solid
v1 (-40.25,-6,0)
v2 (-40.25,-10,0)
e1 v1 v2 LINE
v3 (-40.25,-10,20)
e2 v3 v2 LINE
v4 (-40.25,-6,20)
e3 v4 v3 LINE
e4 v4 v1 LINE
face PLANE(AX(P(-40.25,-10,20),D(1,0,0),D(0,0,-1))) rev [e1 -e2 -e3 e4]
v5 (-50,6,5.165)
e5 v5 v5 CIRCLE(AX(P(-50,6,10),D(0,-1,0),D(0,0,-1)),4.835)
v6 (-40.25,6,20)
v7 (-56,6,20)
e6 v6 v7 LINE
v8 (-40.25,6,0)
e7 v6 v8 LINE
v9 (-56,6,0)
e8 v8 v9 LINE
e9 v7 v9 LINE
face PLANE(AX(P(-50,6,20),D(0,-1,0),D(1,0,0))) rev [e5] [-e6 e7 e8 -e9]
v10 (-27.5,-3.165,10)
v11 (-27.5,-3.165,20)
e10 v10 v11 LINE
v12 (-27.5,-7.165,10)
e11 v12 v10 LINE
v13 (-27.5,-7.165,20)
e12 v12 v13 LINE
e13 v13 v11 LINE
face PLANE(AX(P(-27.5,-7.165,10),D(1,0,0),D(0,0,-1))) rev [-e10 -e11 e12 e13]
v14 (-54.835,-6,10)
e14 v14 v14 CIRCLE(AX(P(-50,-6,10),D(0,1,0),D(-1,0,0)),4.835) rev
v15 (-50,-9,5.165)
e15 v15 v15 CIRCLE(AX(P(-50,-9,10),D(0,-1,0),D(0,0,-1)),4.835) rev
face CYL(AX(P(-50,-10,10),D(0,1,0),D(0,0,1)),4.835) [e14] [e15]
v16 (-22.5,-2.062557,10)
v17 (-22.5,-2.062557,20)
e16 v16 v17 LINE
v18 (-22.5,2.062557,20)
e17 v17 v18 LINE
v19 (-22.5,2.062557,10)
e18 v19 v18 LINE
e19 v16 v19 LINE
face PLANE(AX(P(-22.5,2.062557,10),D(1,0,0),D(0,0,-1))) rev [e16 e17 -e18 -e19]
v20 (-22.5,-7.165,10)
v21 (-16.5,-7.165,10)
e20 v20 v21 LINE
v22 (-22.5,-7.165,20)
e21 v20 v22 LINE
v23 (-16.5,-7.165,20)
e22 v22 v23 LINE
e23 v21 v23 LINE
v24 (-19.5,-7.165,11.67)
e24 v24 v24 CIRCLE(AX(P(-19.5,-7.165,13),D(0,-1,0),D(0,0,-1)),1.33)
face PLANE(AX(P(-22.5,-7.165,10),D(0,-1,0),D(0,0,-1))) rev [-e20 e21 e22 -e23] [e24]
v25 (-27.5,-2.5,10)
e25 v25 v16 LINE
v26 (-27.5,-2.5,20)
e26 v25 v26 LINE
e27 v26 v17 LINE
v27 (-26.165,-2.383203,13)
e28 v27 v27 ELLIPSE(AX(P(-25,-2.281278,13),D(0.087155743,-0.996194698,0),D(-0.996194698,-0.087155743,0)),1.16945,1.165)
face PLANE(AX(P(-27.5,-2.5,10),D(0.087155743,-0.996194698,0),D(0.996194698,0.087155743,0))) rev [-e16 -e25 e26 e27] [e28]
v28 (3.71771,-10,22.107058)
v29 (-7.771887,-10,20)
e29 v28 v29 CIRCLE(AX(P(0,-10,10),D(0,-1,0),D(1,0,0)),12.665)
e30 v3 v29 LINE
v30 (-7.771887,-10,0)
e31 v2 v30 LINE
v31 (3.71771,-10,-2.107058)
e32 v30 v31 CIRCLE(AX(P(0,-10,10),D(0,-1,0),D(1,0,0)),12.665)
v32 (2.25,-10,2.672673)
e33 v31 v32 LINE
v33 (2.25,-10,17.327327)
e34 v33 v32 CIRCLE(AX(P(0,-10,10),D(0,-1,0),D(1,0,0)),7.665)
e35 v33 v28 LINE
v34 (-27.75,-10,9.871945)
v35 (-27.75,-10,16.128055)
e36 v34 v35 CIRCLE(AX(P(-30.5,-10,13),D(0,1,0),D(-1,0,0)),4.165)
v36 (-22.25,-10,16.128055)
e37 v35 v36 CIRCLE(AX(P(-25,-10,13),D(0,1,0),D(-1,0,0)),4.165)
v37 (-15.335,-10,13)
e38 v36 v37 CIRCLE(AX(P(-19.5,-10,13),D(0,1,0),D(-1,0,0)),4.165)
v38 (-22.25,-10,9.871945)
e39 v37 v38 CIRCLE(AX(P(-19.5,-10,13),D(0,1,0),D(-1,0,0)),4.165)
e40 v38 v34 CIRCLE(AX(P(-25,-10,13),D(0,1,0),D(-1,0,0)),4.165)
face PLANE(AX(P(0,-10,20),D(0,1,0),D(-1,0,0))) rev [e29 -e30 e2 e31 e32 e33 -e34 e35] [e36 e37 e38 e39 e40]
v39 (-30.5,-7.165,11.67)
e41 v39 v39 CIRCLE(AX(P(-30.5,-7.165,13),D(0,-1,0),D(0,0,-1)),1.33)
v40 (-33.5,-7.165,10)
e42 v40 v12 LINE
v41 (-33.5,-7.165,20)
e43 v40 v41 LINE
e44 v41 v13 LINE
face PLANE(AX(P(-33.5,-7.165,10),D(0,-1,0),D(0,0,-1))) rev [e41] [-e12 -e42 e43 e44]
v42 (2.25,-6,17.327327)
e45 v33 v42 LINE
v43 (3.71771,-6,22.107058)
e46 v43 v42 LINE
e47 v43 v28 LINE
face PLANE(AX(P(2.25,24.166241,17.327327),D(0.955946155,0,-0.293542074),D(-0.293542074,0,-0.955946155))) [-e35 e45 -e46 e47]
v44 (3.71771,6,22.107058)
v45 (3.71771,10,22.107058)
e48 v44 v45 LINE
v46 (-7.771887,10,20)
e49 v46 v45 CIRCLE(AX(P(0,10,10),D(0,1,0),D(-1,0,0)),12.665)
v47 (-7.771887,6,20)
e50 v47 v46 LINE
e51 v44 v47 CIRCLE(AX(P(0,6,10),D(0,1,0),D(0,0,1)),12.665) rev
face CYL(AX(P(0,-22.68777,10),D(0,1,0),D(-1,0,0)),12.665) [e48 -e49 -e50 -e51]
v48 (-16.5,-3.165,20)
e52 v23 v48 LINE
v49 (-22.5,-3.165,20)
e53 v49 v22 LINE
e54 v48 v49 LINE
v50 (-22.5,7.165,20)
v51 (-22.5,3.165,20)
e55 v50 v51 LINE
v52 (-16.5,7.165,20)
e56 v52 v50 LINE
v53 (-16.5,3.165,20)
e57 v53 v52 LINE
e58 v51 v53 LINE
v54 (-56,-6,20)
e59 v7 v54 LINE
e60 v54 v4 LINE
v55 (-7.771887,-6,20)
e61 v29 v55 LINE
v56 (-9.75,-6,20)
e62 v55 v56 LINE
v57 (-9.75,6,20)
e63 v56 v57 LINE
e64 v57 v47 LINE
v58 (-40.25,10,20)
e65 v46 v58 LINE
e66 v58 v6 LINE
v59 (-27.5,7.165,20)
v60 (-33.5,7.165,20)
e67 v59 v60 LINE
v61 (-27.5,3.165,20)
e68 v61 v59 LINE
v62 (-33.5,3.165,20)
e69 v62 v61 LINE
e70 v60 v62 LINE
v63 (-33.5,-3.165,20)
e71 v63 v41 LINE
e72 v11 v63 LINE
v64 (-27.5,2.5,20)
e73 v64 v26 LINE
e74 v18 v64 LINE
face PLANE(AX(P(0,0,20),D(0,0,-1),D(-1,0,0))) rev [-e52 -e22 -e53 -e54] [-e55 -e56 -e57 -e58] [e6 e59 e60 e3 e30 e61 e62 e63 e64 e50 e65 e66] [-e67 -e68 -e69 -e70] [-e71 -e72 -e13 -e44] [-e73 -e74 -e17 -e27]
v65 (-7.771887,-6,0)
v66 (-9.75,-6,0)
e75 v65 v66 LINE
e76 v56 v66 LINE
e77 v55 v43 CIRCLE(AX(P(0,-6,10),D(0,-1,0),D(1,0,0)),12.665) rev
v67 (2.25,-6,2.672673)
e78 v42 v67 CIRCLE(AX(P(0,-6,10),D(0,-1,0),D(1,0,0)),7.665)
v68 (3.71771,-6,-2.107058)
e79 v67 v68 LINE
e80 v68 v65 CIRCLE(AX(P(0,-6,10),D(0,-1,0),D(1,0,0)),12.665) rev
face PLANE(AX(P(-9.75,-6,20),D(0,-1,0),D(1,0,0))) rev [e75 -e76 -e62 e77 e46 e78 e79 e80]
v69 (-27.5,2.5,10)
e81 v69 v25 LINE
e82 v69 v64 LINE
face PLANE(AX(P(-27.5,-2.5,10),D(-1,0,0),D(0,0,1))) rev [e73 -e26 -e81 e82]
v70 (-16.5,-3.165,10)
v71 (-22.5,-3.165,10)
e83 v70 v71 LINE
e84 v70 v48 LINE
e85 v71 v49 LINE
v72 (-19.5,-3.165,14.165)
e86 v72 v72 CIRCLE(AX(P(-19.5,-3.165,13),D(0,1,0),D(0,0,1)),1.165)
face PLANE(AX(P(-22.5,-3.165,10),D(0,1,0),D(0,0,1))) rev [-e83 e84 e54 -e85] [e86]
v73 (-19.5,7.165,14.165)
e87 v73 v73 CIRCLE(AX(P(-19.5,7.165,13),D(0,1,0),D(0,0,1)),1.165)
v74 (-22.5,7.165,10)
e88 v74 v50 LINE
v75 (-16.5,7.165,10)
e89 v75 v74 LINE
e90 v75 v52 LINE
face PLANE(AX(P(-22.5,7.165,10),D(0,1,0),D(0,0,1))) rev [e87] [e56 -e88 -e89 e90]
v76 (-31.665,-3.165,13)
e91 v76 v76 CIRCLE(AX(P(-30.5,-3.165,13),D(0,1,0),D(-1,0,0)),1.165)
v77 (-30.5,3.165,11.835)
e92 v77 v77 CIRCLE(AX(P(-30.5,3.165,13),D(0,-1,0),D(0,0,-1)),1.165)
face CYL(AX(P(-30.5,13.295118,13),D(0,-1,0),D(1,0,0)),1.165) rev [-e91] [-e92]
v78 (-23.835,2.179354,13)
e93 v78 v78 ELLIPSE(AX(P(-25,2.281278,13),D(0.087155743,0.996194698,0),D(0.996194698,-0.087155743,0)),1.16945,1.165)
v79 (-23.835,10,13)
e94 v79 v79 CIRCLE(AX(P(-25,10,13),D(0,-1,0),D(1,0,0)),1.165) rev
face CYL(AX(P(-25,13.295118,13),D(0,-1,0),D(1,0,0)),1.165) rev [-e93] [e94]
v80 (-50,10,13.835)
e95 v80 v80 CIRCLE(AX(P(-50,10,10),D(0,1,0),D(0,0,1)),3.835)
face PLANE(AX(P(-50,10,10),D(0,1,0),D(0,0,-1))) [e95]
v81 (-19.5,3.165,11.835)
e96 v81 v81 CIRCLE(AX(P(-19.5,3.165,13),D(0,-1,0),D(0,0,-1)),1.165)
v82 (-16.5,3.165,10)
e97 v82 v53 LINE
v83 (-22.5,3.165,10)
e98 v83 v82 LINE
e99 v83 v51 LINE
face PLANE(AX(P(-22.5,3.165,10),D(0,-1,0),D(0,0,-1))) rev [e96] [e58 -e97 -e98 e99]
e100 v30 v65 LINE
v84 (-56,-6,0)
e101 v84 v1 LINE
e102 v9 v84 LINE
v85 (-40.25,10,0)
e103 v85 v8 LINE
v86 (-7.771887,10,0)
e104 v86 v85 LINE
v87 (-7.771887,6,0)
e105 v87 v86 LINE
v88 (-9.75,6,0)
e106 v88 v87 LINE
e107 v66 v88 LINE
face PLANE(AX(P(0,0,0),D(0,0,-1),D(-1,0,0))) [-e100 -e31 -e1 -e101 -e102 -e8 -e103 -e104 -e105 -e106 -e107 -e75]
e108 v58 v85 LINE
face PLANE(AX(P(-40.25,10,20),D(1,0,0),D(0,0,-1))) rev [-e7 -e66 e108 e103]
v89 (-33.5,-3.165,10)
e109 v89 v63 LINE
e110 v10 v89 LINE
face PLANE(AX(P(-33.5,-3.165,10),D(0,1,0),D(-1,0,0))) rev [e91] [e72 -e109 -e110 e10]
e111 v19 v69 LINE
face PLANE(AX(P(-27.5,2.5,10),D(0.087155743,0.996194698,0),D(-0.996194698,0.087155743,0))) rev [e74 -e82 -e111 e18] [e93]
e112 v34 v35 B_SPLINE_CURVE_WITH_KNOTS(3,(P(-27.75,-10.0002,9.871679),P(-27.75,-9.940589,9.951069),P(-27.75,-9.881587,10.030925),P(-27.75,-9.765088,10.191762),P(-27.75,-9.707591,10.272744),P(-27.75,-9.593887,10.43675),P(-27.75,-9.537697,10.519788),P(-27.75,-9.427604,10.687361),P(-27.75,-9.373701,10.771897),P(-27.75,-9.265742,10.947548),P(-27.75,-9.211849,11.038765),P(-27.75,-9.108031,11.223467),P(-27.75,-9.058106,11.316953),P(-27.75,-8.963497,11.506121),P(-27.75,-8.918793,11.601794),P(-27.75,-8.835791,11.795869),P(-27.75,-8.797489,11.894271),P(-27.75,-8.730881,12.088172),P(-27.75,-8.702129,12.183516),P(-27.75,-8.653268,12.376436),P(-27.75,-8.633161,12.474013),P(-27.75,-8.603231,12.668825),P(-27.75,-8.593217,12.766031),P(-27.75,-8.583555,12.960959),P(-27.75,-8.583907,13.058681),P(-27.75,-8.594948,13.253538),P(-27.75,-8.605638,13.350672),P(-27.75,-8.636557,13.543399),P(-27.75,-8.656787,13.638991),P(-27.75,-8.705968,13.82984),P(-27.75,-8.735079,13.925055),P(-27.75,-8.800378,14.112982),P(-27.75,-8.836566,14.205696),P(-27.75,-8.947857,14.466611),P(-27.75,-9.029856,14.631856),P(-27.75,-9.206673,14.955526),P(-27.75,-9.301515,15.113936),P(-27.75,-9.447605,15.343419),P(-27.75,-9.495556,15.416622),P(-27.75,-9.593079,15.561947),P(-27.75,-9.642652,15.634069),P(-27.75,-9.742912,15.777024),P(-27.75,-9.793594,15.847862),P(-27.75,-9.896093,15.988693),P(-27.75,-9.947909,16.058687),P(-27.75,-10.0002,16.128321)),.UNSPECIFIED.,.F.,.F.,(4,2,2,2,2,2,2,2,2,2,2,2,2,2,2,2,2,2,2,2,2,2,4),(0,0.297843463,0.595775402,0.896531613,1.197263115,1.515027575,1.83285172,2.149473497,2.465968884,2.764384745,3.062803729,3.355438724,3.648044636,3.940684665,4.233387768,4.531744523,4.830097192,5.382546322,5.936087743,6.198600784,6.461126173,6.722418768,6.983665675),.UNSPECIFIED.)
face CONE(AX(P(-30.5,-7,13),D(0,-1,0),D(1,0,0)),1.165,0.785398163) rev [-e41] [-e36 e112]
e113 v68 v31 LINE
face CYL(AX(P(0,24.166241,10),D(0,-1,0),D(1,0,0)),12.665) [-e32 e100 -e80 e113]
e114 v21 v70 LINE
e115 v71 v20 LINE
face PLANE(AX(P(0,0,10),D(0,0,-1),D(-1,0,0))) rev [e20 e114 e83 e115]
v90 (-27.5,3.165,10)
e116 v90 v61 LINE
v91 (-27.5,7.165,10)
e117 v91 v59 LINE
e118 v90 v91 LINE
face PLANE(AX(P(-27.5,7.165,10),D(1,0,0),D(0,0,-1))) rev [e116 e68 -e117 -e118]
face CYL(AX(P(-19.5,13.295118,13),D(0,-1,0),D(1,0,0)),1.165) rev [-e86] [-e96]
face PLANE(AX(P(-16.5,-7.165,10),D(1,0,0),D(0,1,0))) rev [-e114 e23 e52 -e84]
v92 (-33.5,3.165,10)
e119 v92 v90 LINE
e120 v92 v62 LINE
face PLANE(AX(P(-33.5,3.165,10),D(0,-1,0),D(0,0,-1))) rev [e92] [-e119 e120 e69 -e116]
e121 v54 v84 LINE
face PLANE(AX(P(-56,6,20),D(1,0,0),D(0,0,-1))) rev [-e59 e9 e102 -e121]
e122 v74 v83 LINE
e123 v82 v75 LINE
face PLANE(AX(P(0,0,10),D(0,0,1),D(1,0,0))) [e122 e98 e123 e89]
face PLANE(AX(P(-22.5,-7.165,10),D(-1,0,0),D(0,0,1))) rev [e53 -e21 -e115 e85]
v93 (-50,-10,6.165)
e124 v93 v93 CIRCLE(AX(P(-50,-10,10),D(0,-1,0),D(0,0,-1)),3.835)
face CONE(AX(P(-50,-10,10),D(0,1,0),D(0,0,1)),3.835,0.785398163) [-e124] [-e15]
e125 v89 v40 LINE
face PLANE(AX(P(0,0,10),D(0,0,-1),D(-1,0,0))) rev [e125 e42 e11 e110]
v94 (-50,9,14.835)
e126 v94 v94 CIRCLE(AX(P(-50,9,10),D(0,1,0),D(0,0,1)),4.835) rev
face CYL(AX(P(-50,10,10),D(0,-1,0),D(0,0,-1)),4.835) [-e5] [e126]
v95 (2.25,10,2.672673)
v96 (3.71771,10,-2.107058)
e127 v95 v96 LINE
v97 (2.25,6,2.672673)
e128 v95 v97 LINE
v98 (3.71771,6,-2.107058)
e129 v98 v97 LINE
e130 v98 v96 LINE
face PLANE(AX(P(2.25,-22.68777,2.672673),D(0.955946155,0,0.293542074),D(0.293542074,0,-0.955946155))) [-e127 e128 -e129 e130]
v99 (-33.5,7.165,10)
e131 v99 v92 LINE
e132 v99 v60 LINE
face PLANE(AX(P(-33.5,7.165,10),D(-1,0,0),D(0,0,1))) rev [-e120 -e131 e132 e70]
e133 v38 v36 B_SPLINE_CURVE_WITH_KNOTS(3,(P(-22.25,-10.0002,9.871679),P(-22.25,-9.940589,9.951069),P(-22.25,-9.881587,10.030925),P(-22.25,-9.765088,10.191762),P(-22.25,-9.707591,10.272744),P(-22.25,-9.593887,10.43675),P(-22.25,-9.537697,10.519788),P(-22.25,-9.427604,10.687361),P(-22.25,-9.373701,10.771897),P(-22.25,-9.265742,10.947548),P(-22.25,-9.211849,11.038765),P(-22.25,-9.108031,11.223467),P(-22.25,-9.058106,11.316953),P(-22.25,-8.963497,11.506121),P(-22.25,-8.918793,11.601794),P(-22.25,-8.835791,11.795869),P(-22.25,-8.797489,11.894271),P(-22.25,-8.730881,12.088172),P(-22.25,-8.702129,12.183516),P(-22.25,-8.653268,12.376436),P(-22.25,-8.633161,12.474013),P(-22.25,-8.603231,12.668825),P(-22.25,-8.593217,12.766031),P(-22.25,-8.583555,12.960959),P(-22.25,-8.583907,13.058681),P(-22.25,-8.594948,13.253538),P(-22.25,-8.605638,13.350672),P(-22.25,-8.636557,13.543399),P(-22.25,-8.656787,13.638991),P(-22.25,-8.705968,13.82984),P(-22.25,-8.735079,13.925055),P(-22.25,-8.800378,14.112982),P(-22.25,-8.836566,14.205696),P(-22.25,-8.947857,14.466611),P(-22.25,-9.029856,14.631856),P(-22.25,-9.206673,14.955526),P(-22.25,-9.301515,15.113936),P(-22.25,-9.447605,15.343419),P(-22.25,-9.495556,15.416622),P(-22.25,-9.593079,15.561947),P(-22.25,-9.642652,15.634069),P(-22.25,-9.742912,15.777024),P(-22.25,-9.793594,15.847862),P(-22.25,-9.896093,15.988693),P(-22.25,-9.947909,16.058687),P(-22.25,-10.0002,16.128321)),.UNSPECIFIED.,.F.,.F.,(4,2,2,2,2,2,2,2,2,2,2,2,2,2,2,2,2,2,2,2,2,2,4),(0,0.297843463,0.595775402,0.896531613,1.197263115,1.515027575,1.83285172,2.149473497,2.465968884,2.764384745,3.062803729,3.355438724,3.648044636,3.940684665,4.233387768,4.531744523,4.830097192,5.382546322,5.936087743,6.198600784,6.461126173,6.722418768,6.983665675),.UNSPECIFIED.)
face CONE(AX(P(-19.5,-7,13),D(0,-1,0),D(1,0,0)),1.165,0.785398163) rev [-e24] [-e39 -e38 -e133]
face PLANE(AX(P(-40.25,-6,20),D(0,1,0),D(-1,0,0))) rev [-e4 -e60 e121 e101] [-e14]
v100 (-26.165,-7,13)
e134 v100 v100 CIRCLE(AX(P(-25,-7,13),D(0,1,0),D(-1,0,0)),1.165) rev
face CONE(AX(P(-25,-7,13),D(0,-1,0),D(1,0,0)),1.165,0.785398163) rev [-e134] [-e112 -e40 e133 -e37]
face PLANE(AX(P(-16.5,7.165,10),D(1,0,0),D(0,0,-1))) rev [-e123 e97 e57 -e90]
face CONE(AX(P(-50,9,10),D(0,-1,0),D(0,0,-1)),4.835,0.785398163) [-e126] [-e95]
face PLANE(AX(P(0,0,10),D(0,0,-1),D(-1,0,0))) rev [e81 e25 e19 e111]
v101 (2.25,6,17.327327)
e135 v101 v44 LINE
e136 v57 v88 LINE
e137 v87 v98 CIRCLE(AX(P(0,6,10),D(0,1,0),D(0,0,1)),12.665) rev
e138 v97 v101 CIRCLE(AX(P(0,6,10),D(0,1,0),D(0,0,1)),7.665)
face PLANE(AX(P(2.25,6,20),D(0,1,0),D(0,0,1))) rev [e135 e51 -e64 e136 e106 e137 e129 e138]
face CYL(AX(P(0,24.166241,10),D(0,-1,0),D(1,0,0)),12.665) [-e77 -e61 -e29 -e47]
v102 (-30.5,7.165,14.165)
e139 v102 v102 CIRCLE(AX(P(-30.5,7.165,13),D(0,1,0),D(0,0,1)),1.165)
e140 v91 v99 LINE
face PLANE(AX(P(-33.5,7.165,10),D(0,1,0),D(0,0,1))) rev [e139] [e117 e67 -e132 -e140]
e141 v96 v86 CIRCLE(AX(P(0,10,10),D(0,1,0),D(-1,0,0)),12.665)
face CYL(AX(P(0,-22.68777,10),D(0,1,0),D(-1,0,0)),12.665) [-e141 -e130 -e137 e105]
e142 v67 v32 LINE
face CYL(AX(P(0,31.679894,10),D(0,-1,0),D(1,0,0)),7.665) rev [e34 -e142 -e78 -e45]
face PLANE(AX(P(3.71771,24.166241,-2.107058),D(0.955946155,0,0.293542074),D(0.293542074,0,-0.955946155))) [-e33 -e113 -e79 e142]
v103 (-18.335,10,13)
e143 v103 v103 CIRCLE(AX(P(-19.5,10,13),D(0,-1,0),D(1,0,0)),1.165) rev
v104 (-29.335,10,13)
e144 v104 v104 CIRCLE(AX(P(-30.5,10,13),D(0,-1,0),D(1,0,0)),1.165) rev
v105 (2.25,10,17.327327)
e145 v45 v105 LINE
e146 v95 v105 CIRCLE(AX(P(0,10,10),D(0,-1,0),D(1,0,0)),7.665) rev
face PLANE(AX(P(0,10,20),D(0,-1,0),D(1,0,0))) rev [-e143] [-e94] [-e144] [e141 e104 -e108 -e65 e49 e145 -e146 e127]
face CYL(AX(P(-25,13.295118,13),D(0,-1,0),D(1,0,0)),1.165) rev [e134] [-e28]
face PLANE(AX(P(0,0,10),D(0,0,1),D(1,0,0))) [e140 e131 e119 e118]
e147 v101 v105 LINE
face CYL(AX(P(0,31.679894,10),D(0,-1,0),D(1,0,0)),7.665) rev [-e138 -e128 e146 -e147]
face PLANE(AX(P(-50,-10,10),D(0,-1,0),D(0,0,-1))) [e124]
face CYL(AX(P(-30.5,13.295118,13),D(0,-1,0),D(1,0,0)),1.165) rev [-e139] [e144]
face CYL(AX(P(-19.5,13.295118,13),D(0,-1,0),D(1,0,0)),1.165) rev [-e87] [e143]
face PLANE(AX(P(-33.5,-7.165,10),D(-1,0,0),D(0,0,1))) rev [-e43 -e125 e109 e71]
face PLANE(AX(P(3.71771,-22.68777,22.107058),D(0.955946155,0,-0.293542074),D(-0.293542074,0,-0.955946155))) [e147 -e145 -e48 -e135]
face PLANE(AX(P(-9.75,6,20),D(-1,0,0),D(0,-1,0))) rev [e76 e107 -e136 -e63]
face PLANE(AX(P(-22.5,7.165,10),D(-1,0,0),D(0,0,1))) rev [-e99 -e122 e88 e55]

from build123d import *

# Parameters (mm, degrees)
BOSS_EXTRUDE1_DEPTH = 20
SKETCH2_R           = 4.835
BOSS_EXTRUDE2_DEPTH = 4
CUT_EXTRUDE1_REACH  = 64.738
SKETCH3_R           = 7.665
CUT_EXTRUDE2_DEPTH  = 10
SKETCH5_W           = 6
SKETCH5_H           = 4
CUT_EXTRUDE3_DEPTH  = 10
CUT_EXTRUDE4_REACH  = 64.738
SKETCH6_R           = 1.165
BOSS_EXTRUDE4_DEPTH = 4
BOSS_EXTRUDE5_START = -4
BOSS_EXTRUDE5_DEPTH = 4
CHAMFER1_SIZE       = 3
CHAMFER2_SIZE       = 1
CHAMFER3_SIZE       = 1


with BuildPart() as part:
    # Sketch1 → Boss-Extrude1 (new body)
    with BuildSketch(Plane.XY):
        Polygon((-40.25, -10), (-40.25, -6), (-50, -6), (-56, -6), (-56, 6), (-50, 6), (-40.25, 6), (-40.25, 10), (0, 10), (2.25, 10), (2.25, 6), (0, 6), (-9.75, 6), (-9.75, -6), (0, -6), (2.25, -6), (2.25, -10), (0, -10), align=None)
    extrude(amount=BOSS_EXTRUDE1_DEPTH)

    # Sketch2 → Boss-Extrude2 (add)
    with BuildSketch(Plane.XZ.offset(6)):
        with Locations(Location((-50, 10, 0), (0, 0, 180))):
            Circle(SKETCH2_R)
    boss_extrude2 = extrude(amount=BOSS_EXTRUDE2_DEPTH)

    # Cut-Extrude1: up to this face of the body (flat: up to its plane)
    cut_extrude1_end = Plane(part.part.faces().sort_by_distance((-19, 10, 10))[0])
    # Sketch3 → Cut-Extrude1 (cut, up to the picked face)
    with BuildSketch(Plane.XZ.offset(10), mode=Mode.PRIVATE) as cut_extrude1_sk1:
        with Locations((0, 10)):
            Circle(SKETCH3_R)
    cut_extrude1_tool1 = split(extrude(cut_extrude1_sk1.sketch, amount=-CUT_EXTRUDE1_REACH, mode=Mode.PRIVATE), bisect_by=cut_extrude1_end, keep=Keep.BOTH, mode=Mode.PRIVATE)
    add(cut_extrude1_tool1.solids().sort_by(Axis((0, -10, 10), (0, 1, 0)))[0], mode=Mode.SUBTRACT)

    # Mirror1: Boss-Extrude2 across plane
    add(boss_extrude2.mirror(Plane.ZX))

    # Sketch4 → Cut-Extrude2 (cut)
    with BuildSketch(Plane.XY.offset(20)):
        Polygon((-27.5, 2.5), (-22.5, 2.062556682), (-22.5, -2.062556682), (-27.5, -2.5), align=None)
    extrude(amount=-CUT_EXTRUDE2_DEPTH, mode=Mode.SUBTRACT)

    # Sketch5 → Cut-Extrude3 (cut)
    with BuildSketch(Plane.XY.offset(20)):
        with Locations((-30.5, 5.165)):
            Rectangle(SKETCH5_W, SKETCH5_H)
        with Locations((-19.5, 5.165)):
            Rectangle(SKETCH5_W, SKETCH5_H)
        with Locations((-19.5, -5.165)):
            Rectangle(SKETCH5_W, SKETCH5_H)
        with Locations((-30.5, -5.165)):
            Rectangle(SKETCH5_W, SKETCH5_H)
    extrude(amount=-CUT_EXTRUDE3_DEPTH, mode=Mode.SUBTRACT)

    # Cut-Extrude4: up to this face of the body (flat: up to its plane)
    cut_extrude4_end = Plane(part.part.faces().sort_by_distance((-21.952820108, 10, 10))[0])
    # Sketch6 → Cut-Extrude4 (cut, up to the picked face)
    with BuildSketch(Plane.XZ.offset(10), mode=Mode.PRIVATE) as cut_extrude4_sk1:
        with Locations(Location((-30.5, 13, 0), (0, 0, 270))):
            Circle(SKETCH6_R)
    cut_extrude4_tool1 = split(extrude(cut_extrude4_sk1.sketch, amount=-CUT_EXTRUDE4_REACH, mode=Mode.PRIVATE), bisect_by=cut_extrude4_end, keep=Keep.BOTH, mode=Mode.PRIVATE)
    # Sketch6 → Cut-Extrude4 (cut, up to the picked face)
    with BuildSketch(Plane.XZ.offset(10), mode=Mode.PRIVATE) as cut_extrude4_sk2:
        with Locations((-25, 13)):
            Circle(SKETCH6_R)
    cut_extrude4_tool2 = split(extrude(cut_extrude4_sk2.sketch, amount=-CUT_EXTRUDE4_REACH, mode=Mode.PRIVATE), bisect_by=cut_extrude4_end, keep=Keep.BOTH, mode=Mode.PRIVATE)
    # Sketch6 → Cut-Extrude4 (cut, up to the picked face)
    with BuildSketch(Plane.XZ.offset(10), mode=Mode.PRIVATE) as cut_extrude4_sk3:
        with Locations(Location((-19.5, 13, 0), (0, 0, 90))):
            Circle(SKETCH6_R)
    cut_extrude4_tool3 = split(extrude(cut_extrude4_sk3.sketch, amount=-CUT_EXTRUDE4_REACH, mode=Mode.PRIVATE), bisect_by=cut_extrude4_end, keep=Keep.BOTH, mode=Mode.PRIVATE)
    add(cut_extrude4_tool1.solids().sort_by(Axis((-30.5, -10, 13), (0, 1, 0)))[0], mode=Mode.SUBTRACT)
    add(cut_extrude4_tool2.solids().sort_by(Axis((-25, -10, 13), (0, 1, 0)))[0], mode=Mode.SUBTRACT)
    add(cut_extrude4_tool3.solids().sort_by(Axis((-19.5, -10, 13), (0, 1, 0)))[0], mode=Mode.SUBTRACT)

    # Sketch10 → Boss-Extrude4 (add)
    with BuildSketch(Plane.XZ.offset(10)):
        with BuildLine():
            Line((2.25, 17.327327275), (3.717710372, 22.107058049))
            ThreePointArc((3.717710372, 22.107058049), (-12.665, 10), (3.717710372, -2.107058049))
            Line((3.717710372, -2.107058049), (2.25, 2.672672725))
            ThreePointArc((2.25, 2.672672725), (-7.665, 10), (2.25, 17.327327275))
        make_face()
    extrude(amount=-BOSS_EXTRUDE4_DEPTH)

    # Sketch11 → Boss-Extrude5 (add)
    with BuildSketch(Plane(origin=(0, 10, 0), x_dir=(1, 0, 0), z_dir=(0, 1, 0)).offset(BOSS_EXTRUDE5_START)):
        with BuildLine():
            Line((-9.75, -20), (-7.771886837, -20))
            ThreePointArc((-7.771886837, -20), (-2.284515289, -22.457255512), (3.717710372, -22.107058049))
            Line((3.717710372, -22.107058049), (2.25, -17.327327275))
            ThreePointArc((2.25, -17.327327275), (-7.665, -10), (2.25, -2.672672725))
            Line((2.25, -2.672672725), (3.717710372, 2.107058049))
            ThreePointArc((3.717710372, 2.107058049), (-2.284515289, 2.457255512), (-7.771886837, 0))
            Line((-7.771886837, 0), (-9.75, 0))
            Line((-9.75, 0), (-9.75, -20))
        make_face()
    extrude(amount=BOSS_EXTRUDE5_DEPTH)

    # Chamfer1
    # the kernel refuses this chamfer: 3 mm, written as the material it takes off along each edge
    with BuildSketch(Plane(origin=(-30.5, -10, 13), x_dir=(0, 0, -1), z_dir=(-1, 0, 0))) as chamfer1_piece_1:
        Polygon((1.165, -CHAMFER1_SIZE), (1.165 + CHAMFER1_SIZE, 0), (1.165, 0), align=None)
    revolve(axis=Axis((-30.5, -10, 13), (0, -1, 0)), mode=Mode.SUBTRACT)
    with BuildSketch(Plane(origin=(-25, -10, 13), x_dir=(1, 0, 0), z_dir=(0, 0, -1))) as chamfer1_piece_2:
        Polygon((1.165, -CHAMFER1_SIZE), (1.165 + CHAMFER1_SIZE, 0), (1.165, 0), align=None)
    revolve(axis=Axis((-25, -10, 13), (0, -1, 0)), mode=Mode.SUBTRACT)
    with BuildSketch(Plane(origin=(-19.5, -10, 13), x_dir=(0, 0, 1), z_dir=(1, 0, 0))) as chamfer1_piece_3:
        Polygon((1.165, -CHAMFER1_SIZE), (1.165 + CHAMFER1_SIZE, 0), (1.165, 0), align=None)
    revolve(axis=Axis((-19.5, -10, 13), (0, -1, 0)), mode=Mode.SUBTRACT)

    # Chamfer2
    chamfer2_edges = [part.edges().sort_by_distance(p)[0] for p in [
        (-45.165, -10, 10),
    ]]
    chamfer(chamfer2_edges, length=CHAMFER2_SIZE)

    # Chamfer3
    chamfer3_edges = [part.edges().sort_by_distance(p)[0] for p in [
        (-45.165, 10, 10),
    ]]
    chamfer(chamfer3_edges, length=CHAMFER3_SIZE)


solid = part.part
